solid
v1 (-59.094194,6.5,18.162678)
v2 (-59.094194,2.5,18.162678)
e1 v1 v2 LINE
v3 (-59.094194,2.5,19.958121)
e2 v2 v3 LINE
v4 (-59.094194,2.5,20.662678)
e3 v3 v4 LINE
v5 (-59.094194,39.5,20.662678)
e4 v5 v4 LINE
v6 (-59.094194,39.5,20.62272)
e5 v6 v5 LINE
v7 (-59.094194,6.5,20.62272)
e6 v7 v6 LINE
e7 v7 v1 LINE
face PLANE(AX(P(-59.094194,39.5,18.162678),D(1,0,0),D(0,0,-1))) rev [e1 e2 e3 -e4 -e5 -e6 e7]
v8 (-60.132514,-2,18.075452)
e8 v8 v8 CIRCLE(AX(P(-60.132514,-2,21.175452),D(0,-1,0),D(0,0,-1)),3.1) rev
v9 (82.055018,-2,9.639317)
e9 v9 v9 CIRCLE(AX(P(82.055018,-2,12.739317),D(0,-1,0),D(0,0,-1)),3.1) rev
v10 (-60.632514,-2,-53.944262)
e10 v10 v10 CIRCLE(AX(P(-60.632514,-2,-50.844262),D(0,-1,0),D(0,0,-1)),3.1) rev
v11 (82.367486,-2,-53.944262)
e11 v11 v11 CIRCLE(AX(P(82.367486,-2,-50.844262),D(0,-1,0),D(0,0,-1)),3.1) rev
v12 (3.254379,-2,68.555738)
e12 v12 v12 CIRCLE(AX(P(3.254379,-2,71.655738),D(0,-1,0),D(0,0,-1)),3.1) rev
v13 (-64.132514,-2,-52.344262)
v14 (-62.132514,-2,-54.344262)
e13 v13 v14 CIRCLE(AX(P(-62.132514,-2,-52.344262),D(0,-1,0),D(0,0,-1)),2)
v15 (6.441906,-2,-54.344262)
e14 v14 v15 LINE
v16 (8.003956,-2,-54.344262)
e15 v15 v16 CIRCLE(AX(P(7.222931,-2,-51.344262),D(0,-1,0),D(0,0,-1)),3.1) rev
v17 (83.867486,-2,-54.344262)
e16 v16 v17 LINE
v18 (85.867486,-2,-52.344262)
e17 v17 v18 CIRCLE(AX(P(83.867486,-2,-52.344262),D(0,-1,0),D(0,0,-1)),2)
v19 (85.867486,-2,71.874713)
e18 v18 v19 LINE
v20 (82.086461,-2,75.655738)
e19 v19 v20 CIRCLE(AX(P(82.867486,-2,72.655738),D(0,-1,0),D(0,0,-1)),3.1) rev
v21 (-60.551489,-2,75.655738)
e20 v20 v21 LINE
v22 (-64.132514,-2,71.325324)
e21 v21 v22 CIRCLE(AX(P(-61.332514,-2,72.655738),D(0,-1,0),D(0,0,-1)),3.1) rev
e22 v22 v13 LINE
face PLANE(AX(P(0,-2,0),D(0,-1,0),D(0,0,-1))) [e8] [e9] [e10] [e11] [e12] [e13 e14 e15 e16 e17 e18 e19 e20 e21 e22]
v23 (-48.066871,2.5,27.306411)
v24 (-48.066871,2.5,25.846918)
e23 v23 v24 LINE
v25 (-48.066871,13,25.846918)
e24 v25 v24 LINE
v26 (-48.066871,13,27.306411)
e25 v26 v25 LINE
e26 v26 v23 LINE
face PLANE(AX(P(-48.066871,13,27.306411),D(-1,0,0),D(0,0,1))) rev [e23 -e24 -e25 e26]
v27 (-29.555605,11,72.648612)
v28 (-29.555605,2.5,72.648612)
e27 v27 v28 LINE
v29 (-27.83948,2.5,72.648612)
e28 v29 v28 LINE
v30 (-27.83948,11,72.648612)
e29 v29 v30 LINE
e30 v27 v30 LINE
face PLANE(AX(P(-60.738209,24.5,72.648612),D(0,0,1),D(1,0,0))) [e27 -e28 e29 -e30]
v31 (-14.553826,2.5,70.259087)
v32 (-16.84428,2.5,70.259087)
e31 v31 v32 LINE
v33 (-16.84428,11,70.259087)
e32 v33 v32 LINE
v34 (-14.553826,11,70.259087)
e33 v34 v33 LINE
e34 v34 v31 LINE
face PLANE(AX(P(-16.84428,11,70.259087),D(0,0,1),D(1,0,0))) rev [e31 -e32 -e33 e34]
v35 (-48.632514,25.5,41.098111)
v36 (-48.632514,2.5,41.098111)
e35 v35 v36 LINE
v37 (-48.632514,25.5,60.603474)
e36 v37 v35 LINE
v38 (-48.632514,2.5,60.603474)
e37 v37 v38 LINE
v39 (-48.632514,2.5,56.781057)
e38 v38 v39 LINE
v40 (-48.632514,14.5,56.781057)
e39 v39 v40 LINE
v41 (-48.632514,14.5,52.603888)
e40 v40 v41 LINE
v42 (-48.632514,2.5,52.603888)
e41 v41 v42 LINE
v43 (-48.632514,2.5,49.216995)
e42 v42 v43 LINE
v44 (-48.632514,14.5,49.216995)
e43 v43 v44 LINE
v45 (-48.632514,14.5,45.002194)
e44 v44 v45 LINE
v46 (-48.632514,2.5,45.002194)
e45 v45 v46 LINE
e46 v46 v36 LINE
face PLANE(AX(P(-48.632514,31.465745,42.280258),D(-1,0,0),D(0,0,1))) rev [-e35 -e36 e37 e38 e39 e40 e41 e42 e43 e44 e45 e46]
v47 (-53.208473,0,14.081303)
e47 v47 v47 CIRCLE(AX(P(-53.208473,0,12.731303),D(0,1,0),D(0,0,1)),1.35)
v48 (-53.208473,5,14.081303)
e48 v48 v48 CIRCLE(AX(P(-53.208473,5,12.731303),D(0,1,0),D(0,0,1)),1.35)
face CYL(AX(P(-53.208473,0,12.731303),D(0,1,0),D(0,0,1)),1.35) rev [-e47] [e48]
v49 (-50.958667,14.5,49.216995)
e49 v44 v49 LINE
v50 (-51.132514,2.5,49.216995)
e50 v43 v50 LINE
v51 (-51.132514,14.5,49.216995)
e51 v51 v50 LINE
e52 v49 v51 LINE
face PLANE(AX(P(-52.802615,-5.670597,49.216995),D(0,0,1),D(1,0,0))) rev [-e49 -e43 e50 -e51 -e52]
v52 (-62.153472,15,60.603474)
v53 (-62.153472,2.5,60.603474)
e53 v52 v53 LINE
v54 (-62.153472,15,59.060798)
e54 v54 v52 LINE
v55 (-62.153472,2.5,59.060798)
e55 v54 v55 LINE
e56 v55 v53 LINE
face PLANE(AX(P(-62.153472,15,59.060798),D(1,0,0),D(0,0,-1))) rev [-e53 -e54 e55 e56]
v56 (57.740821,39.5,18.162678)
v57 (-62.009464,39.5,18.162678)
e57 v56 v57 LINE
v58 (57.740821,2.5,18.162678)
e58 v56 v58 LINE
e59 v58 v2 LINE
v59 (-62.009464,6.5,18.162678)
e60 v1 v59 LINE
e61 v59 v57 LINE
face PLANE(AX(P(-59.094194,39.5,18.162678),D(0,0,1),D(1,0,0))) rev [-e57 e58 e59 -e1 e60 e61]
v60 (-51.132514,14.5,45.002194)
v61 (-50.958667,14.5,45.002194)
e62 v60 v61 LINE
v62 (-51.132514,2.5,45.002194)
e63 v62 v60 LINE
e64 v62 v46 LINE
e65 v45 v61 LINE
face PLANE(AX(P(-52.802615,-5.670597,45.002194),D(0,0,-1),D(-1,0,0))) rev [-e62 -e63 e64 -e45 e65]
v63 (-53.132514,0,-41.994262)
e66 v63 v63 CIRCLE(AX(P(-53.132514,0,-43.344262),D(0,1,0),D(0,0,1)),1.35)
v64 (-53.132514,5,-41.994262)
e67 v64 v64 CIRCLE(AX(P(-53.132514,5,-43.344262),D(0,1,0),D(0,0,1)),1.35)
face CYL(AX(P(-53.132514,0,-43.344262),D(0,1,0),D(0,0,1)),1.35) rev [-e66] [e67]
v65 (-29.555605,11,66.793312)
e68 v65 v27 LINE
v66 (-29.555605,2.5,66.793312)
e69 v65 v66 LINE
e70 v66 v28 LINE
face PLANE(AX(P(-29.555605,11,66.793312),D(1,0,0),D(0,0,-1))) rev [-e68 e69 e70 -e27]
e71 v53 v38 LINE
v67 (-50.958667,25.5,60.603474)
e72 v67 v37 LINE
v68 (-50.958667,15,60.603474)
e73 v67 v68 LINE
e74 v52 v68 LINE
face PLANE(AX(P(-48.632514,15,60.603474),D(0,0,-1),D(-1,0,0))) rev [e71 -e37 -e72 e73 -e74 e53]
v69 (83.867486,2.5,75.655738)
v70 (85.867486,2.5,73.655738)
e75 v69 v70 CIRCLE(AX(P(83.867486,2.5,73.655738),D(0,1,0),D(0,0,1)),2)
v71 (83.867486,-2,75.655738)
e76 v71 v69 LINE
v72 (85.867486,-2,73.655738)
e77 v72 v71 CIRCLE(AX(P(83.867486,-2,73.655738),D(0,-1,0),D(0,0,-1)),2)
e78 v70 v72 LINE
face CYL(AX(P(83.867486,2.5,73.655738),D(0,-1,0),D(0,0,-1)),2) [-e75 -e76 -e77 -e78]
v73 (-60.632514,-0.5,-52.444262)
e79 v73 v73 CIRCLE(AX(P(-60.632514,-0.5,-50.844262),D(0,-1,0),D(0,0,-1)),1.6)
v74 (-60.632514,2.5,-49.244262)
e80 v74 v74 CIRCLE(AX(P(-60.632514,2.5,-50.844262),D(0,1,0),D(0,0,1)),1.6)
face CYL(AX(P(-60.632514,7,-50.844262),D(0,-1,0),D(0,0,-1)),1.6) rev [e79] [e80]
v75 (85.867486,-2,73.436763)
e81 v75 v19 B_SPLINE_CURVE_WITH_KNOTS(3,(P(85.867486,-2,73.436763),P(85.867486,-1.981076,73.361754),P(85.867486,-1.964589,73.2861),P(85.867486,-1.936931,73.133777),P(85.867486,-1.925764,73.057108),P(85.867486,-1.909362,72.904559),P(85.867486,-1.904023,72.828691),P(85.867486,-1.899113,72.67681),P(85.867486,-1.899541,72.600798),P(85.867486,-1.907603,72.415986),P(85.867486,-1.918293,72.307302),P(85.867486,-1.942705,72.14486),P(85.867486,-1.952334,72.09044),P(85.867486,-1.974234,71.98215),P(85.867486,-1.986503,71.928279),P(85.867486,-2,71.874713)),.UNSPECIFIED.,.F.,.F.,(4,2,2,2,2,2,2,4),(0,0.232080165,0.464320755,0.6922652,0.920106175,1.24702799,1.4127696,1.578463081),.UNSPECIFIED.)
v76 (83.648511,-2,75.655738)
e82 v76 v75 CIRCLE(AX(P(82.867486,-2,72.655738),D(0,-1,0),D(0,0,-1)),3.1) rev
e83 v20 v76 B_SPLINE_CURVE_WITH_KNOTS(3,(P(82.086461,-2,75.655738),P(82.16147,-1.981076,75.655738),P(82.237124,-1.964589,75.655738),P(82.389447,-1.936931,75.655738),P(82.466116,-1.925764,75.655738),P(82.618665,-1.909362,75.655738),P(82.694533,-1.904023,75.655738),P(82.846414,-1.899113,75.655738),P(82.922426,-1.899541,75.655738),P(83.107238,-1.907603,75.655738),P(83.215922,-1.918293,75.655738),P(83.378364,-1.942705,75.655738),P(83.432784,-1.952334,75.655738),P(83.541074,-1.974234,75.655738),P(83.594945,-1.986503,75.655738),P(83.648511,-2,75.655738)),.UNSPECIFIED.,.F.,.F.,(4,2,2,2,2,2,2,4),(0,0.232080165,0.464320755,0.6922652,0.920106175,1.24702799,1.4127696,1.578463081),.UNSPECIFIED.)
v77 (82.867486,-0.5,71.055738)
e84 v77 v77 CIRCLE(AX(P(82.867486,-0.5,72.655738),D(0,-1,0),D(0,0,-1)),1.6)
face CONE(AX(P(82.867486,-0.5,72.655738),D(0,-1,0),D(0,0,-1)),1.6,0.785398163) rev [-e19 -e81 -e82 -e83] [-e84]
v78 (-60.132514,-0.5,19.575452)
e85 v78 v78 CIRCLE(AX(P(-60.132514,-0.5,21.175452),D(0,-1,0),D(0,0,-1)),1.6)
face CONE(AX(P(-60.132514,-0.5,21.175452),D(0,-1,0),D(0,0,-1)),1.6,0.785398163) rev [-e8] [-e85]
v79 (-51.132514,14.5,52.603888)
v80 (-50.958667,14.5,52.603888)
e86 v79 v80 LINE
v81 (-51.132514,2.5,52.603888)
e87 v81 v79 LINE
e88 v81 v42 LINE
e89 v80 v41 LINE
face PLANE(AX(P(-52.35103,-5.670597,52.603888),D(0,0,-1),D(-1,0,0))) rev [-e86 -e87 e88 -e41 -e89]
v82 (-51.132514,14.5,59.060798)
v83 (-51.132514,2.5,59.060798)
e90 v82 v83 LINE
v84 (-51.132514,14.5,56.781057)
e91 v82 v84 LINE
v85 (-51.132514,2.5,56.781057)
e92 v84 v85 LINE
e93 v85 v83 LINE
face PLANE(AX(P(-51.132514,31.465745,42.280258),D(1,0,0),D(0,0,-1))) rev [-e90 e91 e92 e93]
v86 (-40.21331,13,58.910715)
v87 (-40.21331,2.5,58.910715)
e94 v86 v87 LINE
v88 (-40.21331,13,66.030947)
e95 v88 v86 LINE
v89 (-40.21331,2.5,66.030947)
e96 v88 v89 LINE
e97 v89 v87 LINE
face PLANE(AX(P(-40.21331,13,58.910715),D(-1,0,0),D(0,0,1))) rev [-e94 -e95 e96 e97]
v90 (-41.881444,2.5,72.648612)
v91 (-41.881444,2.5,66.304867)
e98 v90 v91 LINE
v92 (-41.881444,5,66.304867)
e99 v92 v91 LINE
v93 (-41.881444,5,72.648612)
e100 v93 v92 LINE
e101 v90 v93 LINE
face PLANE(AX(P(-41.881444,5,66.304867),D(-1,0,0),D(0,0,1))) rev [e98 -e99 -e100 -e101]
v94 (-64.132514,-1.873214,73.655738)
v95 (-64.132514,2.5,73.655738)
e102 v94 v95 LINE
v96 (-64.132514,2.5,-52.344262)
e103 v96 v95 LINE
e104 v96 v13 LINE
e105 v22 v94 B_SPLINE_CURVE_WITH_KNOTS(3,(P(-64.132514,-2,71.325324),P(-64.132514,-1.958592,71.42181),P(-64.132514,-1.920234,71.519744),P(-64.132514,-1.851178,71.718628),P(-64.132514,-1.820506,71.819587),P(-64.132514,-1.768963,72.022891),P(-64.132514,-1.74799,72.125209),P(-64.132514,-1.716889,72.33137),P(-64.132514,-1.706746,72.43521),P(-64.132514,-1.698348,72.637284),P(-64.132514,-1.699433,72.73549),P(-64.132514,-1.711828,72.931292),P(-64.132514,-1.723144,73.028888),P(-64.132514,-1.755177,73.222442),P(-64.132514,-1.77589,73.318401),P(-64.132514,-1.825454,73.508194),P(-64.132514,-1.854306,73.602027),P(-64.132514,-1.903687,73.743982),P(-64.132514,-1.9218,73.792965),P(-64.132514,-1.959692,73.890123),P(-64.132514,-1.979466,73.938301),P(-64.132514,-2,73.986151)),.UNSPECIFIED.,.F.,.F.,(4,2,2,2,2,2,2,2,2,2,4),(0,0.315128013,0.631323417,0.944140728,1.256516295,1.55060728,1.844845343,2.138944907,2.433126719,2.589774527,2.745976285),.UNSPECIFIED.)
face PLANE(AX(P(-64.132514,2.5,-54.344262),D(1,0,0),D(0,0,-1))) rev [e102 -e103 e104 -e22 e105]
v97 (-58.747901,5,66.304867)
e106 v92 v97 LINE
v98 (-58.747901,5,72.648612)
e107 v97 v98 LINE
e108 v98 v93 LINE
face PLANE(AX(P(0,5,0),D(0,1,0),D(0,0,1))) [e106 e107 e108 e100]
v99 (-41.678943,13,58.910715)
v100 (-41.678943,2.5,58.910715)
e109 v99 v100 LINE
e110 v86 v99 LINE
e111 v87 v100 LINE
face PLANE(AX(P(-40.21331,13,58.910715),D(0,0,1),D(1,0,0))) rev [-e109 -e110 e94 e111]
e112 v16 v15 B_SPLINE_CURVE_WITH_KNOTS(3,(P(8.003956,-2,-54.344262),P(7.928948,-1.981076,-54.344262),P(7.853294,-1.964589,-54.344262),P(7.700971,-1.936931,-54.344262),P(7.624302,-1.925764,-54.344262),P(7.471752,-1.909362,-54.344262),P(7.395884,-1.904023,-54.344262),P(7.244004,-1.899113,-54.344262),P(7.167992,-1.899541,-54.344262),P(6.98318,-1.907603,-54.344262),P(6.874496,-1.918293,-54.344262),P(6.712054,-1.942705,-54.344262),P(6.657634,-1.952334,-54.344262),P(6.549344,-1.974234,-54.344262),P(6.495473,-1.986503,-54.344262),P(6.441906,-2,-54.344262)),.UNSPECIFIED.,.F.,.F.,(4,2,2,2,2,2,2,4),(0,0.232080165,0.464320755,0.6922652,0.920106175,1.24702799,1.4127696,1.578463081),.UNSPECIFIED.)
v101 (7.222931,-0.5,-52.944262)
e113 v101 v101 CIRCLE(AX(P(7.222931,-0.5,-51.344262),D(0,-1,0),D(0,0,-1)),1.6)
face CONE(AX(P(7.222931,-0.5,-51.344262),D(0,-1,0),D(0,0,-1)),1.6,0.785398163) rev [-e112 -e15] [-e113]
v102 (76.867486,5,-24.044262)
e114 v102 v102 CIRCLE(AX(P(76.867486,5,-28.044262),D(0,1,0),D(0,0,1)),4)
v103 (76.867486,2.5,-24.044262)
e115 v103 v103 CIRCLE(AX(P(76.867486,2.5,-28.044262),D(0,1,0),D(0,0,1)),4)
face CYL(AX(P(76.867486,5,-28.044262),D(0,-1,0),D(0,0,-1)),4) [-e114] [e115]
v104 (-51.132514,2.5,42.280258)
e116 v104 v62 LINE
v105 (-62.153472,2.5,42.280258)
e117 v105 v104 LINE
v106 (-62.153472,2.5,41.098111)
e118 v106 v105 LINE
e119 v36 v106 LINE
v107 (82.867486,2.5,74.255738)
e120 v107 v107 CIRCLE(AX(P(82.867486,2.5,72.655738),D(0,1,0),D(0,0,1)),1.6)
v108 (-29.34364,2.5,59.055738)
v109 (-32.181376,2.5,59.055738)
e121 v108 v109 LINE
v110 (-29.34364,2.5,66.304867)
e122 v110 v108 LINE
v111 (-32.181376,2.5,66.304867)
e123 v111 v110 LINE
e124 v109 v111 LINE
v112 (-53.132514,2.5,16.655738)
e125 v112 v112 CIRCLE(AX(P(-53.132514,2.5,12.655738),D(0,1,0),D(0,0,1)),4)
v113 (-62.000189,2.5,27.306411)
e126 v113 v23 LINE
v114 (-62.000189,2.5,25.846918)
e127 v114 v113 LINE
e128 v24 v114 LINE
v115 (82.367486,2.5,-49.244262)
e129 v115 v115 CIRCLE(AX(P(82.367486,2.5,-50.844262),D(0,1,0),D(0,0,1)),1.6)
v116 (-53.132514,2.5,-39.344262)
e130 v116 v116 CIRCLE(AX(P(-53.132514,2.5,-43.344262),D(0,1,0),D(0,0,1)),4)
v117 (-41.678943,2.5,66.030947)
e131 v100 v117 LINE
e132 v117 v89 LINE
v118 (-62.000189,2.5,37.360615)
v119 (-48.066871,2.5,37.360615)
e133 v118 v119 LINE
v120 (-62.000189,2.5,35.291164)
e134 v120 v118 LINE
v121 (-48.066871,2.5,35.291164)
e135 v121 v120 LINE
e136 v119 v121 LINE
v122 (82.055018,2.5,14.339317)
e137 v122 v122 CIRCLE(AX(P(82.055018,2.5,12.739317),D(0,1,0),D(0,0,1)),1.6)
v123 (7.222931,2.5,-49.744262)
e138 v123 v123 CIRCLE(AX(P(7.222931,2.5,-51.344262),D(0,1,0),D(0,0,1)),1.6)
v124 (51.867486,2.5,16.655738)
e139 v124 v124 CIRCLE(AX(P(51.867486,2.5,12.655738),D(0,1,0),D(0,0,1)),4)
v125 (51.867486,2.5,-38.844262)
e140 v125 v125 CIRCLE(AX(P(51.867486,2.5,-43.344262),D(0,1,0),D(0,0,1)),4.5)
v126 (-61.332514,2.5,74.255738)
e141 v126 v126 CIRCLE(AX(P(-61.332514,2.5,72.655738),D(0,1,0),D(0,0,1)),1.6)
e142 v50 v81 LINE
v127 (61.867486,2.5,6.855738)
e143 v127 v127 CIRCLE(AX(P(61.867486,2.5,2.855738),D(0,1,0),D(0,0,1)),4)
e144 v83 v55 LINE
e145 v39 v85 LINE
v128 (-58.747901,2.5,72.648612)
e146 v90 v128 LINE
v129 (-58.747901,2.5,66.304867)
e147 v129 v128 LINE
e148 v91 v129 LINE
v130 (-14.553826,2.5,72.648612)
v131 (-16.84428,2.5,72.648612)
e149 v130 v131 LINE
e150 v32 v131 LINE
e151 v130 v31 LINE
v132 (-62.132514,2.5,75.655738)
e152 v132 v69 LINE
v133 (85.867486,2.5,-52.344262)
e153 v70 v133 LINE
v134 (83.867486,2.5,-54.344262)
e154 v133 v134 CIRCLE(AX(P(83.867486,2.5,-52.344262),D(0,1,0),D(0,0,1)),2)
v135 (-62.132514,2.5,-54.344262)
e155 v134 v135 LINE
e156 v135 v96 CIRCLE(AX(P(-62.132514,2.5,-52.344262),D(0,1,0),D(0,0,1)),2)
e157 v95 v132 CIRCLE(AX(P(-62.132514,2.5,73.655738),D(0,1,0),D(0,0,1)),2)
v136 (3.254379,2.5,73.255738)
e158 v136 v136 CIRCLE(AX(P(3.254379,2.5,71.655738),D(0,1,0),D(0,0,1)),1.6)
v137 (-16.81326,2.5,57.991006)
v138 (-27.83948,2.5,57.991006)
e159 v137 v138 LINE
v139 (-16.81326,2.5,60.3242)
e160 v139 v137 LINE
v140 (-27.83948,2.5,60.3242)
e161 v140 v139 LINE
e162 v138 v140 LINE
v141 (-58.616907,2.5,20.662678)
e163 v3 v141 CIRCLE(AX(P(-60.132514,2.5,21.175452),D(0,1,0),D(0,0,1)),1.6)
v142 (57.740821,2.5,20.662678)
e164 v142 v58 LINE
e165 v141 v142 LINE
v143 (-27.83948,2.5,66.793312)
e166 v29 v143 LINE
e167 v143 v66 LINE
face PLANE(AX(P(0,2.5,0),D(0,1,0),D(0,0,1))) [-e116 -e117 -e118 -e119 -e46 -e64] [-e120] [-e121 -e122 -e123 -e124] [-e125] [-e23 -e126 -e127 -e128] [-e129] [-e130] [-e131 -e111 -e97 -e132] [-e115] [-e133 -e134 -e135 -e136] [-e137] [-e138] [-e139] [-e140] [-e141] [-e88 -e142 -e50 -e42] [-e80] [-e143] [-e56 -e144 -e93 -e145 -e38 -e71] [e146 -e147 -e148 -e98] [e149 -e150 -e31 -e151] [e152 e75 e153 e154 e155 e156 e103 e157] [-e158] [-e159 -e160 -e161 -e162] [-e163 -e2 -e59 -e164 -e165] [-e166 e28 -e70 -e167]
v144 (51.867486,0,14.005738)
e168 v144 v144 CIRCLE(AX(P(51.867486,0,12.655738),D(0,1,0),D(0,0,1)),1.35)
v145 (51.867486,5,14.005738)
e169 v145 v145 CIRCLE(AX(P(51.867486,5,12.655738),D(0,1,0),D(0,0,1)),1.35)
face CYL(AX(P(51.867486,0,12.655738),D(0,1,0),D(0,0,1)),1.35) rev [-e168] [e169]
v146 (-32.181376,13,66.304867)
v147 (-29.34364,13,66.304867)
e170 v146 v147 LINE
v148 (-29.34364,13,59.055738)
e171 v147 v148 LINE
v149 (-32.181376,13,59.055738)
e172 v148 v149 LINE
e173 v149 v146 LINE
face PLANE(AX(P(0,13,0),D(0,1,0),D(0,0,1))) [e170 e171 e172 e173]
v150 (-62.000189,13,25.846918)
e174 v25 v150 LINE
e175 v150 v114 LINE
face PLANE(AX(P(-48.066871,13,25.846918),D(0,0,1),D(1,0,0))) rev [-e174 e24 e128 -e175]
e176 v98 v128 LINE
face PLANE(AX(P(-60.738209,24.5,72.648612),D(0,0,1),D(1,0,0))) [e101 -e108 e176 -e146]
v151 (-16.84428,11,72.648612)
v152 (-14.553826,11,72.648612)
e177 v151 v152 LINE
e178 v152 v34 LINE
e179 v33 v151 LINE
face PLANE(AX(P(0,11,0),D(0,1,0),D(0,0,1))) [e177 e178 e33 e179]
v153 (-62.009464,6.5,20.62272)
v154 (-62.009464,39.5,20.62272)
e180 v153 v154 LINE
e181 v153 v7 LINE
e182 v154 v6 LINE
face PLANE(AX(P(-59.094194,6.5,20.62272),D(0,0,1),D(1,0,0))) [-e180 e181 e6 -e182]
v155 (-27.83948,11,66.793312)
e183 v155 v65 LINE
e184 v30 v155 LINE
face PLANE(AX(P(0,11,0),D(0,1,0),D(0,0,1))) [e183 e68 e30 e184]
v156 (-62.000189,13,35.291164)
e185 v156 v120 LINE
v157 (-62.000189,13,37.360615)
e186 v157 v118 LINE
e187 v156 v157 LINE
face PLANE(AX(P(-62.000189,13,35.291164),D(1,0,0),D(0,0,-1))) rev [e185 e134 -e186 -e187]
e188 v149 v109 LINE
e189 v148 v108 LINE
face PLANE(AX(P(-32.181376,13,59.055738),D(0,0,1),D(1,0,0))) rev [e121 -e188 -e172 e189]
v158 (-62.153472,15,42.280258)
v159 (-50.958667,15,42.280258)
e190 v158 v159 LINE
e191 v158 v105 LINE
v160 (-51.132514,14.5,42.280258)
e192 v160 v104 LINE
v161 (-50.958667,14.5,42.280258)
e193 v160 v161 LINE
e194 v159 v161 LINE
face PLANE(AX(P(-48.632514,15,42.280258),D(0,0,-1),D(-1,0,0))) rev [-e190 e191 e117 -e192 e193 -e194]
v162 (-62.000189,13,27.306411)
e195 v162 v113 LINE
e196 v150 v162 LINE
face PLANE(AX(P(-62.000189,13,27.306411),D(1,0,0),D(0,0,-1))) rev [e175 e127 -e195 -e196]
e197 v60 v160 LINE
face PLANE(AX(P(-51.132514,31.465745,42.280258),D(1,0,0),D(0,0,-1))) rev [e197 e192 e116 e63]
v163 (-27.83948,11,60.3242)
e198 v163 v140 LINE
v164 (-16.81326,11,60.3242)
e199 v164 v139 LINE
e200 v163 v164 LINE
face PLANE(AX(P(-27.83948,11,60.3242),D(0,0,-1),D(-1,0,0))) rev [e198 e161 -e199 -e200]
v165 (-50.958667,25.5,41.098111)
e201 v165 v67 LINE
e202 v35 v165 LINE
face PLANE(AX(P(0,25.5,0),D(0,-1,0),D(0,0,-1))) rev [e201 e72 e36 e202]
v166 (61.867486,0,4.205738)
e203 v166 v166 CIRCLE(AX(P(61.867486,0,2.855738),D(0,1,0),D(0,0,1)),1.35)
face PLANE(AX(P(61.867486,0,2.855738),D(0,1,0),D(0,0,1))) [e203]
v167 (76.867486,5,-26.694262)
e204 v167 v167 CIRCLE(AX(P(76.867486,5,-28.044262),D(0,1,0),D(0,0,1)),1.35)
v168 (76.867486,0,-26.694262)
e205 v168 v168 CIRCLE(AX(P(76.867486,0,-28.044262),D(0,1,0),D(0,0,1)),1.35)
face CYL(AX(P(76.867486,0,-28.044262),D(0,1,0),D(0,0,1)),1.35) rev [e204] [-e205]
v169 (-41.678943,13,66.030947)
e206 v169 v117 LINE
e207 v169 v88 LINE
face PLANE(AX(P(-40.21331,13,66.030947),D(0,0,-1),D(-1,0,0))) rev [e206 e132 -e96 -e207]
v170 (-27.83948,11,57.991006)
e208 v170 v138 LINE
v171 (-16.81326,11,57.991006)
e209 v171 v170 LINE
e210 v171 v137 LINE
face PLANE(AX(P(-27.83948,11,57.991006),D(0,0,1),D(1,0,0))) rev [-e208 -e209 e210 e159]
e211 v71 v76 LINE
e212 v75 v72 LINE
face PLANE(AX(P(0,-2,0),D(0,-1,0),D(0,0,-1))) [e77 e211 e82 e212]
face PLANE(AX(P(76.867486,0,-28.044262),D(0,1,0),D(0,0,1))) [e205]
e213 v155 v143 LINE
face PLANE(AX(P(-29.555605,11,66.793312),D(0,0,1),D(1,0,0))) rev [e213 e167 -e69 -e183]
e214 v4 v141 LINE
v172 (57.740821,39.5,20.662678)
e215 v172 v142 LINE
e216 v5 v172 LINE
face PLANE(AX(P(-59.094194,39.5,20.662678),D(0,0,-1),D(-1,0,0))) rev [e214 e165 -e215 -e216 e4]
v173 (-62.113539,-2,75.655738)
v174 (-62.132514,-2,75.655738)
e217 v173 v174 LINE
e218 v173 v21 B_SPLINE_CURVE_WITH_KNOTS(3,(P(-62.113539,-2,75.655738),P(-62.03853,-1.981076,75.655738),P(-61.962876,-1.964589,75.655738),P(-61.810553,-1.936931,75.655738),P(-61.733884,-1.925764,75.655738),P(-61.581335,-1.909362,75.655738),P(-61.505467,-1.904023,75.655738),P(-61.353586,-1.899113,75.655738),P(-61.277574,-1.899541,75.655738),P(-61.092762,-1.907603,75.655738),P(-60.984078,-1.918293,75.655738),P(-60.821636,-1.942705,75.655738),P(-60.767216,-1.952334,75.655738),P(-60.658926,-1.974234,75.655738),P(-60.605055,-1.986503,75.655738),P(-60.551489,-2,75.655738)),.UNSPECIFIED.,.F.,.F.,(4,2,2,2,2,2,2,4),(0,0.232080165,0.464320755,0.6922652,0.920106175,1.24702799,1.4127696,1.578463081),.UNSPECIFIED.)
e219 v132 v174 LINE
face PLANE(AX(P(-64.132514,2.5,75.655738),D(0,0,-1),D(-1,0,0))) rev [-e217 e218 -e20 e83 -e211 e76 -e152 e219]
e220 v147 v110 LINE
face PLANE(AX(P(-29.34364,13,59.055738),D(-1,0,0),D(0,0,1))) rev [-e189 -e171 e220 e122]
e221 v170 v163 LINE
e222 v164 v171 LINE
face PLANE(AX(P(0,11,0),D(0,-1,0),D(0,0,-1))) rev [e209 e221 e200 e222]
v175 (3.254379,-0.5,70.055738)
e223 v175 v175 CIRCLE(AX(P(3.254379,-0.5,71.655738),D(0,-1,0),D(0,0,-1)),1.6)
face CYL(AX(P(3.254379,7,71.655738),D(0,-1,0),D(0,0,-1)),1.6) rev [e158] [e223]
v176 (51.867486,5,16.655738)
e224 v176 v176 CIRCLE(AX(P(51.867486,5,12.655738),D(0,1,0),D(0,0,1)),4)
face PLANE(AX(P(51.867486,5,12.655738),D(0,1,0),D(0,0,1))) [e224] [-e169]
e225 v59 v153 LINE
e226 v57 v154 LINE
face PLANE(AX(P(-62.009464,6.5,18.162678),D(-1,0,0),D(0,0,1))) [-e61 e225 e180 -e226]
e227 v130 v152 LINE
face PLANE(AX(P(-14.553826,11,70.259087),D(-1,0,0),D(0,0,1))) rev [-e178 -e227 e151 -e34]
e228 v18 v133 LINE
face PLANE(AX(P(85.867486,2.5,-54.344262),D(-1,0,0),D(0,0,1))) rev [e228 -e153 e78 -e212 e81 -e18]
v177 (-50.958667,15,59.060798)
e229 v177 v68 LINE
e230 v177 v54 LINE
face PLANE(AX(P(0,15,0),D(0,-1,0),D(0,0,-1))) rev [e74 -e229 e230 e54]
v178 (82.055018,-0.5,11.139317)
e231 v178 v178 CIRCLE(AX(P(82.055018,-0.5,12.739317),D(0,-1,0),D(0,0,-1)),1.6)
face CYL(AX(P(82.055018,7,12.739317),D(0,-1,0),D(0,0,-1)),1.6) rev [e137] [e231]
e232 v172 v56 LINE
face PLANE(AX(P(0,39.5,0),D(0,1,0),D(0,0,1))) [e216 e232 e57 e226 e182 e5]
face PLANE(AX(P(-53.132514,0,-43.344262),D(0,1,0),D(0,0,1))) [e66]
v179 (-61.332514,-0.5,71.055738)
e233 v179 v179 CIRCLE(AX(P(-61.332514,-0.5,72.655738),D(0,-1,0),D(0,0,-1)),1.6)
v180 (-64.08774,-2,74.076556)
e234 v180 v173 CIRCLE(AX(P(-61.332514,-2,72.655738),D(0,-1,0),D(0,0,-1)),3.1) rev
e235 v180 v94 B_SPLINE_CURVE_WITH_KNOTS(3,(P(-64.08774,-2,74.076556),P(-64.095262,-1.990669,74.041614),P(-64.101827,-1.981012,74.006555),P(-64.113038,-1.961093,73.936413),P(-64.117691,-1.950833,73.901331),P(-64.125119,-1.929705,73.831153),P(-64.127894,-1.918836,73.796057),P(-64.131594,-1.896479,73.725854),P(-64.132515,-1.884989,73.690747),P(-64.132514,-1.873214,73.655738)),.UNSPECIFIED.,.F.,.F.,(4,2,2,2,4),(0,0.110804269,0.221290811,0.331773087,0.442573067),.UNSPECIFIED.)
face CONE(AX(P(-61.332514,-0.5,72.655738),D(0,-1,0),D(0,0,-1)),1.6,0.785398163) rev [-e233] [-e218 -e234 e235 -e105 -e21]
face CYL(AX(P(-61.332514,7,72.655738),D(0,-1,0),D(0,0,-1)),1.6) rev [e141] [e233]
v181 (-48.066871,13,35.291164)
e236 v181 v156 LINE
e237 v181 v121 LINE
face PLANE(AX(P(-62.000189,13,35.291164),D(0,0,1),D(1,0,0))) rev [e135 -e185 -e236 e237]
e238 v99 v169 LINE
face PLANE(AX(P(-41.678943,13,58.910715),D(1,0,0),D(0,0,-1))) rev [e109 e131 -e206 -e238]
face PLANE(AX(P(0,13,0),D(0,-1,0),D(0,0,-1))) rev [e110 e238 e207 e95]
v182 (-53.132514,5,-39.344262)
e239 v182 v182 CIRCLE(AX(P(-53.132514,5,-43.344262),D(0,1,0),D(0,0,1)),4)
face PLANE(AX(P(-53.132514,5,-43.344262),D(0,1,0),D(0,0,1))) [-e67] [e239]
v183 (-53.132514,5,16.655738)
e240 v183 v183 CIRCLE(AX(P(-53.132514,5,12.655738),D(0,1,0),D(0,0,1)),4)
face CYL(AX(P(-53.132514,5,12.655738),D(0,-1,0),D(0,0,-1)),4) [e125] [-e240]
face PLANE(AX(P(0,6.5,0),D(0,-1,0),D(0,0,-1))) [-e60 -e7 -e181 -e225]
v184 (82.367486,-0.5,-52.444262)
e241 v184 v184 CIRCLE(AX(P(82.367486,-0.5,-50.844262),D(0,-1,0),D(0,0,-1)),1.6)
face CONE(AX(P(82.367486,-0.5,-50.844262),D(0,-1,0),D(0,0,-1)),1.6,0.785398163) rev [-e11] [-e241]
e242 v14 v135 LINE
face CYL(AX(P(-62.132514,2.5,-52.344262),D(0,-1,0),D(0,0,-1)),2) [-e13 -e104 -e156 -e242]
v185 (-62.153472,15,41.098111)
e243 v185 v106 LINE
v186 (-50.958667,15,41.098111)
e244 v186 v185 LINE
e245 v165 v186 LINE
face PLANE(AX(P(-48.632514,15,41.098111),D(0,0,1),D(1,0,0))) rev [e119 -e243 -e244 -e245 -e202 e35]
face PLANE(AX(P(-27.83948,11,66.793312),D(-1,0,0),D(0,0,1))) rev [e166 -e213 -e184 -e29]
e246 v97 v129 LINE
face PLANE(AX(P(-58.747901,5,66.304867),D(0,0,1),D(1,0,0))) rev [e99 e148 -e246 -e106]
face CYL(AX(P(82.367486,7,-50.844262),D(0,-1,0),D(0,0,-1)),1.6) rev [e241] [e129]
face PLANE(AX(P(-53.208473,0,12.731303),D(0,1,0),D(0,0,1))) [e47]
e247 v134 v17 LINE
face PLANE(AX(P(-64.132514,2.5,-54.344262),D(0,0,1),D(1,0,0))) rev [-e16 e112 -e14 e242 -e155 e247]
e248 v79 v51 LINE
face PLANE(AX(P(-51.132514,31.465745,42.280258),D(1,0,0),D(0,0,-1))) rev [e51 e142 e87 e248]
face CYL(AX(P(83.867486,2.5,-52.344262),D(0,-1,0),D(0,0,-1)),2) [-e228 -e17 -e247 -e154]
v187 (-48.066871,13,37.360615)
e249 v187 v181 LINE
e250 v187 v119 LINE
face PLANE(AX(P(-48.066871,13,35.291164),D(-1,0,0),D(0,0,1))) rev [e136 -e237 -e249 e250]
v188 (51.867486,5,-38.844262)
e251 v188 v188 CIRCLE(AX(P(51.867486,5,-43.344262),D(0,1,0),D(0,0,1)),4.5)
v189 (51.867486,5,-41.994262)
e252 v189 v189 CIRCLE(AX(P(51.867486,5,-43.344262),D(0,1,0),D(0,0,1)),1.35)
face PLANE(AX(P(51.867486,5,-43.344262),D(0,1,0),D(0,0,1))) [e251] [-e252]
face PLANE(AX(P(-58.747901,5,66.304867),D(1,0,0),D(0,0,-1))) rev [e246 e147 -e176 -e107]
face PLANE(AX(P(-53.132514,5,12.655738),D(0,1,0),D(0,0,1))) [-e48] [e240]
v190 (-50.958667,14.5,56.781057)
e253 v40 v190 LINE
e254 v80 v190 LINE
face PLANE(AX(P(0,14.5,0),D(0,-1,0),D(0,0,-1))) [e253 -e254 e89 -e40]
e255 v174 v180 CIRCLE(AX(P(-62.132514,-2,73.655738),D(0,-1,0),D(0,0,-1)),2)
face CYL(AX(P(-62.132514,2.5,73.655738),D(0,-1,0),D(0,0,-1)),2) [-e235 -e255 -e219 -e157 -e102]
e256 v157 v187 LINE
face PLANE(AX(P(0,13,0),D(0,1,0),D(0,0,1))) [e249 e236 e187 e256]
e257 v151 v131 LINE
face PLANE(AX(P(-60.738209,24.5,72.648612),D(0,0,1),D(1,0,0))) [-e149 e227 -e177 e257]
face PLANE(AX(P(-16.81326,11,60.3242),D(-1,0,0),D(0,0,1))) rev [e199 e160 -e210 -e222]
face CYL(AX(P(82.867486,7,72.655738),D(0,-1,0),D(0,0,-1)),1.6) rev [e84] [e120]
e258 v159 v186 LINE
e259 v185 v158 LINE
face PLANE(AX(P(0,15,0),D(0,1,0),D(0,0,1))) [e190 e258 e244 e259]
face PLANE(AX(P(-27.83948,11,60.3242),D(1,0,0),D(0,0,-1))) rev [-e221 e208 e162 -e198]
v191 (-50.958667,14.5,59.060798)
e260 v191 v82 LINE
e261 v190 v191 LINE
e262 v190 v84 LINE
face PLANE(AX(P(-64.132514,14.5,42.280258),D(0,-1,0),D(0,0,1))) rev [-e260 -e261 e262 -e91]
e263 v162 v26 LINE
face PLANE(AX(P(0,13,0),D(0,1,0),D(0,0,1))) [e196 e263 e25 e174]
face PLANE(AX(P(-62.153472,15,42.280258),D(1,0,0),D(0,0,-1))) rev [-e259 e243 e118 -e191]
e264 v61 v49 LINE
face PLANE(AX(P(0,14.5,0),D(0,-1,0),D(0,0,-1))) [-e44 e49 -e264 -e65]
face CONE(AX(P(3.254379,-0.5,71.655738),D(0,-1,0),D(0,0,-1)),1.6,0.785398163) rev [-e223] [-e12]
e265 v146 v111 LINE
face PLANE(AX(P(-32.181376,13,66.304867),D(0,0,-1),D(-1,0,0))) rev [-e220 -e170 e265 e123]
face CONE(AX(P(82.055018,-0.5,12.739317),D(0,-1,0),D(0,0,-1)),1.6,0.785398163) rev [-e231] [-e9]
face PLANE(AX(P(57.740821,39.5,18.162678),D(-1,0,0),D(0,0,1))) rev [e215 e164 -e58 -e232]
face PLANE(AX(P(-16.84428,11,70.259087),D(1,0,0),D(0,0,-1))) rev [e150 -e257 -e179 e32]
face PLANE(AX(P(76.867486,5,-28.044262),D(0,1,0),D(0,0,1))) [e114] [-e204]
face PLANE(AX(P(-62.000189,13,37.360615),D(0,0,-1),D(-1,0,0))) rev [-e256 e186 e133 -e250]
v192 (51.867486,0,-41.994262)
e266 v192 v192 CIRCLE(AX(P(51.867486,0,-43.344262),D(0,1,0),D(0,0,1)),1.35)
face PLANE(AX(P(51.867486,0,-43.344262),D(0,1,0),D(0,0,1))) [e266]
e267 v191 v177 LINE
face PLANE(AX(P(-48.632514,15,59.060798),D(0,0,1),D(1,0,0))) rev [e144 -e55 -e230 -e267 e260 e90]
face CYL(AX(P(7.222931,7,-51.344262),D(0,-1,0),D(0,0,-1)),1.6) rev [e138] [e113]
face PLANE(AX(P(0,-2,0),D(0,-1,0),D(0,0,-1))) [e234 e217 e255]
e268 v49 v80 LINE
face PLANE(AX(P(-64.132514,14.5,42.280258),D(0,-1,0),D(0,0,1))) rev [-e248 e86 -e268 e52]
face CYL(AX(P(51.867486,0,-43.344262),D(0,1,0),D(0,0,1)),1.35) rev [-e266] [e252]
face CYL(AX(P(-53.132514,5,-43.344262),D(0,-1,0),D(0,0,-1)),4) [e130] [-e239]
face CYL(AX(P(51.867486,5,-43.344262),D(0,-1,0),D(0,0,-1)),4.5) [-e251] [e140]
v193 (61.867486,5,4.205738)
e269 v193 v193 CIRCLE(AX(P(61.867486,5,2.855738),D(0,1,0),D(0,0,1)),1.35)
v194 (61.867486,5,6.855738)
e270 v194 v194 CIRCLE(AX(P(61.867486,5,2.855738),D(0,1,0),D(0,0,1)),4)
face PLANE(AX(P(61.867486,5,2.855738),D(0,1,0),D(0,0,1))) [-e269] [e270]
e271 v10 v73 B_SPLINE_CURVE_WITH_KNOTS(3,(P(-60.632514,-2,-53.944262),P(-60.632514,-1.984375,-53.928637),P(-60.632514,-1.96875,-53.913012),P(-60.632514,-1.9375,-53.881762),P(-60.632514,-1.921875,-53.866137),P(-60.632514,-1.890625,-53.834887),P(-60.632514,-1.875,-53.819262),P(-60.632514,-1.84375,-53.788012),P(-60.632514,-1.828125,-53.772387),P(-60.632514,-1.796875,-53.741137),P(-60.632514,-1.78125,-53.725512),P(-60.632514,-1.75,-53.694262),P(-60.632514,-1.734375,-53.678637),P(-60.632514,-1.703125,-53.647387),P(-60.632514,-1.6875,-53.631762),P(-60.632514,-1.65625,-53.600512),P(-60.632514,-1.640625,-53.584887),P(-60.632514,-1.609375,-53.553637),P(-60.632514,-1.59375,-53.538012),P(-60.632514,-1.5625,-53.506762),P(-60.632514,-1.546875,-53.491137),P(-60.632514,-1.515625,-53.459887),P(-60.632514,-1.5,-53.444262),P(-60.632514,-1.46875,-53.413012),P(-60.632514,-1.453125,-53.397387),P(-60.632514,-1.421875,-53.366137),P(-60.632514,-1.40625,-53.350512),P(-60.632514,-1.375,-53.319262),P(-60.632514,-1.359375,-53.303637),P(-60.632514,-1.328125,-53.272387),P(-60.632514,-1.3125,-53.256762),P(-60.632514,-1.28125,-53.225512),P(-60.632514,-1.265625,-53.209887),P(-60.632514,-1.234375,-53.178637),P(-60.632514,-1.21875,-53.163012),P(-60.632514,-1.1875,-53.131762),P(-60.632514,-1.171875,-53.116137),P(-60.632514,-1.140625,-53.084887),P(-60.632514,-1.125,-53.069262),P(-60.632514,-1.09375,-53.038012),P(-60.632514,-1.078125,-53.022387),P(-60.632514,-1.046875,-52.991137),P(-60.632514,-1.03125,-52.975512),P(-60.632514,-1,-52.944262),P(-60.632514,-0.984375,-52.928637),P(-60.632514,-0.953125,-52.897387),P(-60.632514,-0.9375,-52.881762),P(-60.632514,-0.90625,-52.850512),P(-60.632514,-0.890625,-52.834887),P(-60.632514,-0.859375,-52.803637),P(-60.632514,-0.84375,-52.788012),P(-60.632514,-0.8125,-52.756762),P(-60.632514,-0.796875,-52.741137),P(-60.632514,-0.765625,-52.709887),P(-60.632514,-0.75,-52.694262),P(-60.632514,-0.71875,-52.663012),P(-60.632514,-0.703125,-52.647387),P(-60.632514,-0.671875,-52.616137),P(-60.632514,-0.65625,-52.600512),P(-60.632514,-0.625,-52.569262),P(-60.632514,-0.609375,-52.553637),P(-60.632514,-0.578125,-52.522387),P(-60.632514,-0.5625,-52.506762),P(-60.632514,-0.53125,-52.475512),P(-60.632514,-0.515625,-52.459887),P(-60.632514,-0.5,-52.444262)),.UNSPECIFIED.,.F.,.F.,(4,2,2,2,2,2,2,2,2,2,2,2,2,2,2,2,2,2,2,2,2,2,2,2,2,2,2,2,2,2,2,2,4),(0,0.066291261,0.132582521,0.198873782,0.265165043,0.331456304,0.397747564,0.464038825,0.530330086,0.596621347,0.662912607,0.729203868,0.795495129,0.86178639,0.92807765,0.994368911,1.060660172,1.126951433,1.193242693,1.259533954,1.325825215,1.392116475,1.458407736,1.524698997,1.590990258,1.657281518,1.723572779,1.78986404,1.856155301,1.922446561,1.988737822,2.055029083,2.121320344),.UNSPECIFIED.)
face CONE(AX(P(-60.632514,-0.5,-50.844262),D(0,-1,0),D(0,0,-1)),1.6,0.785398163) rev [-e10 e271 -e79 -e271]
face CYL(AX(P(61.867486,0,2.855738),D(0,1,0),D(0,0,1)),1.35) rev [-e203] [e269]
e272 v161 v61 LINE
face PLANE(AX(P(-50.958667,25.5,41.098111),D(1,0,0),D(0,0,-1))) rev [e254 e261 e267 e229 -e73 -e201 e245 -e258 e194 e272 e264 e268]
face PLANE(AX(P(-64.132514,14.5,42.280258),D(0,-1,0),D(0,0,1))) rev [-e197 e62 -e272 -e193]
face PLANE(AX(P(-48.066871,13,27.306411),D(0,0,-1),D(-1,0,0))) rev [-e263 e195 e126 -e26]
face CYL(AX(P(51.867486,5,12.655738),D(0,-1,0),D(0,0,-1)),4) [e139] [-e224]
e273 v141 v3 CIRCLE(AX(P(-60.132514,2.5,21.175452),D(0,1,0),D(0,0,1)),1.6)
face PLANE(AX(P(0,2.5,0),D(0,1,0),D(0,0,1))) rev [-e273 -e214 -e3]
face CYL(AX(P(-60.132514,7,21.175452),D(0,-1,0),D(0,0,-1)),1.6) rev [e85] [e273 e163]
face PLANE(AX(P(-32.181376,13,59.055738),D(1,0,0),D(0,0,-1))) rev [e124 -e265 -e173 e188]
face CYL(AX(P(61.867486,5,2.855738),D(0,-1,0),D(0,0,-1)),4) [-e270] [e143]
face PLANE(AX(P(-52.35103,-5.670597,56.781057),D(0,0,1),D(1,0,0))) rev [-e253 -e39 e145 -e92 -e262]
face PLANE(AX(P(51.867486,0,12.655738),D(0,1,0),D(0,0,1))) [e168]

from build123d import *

# Parameters (mm, degrees)
SKETCH1_W            = 150
SKETCH1_H            = 130
BOSS_EXTRUDE1_DEPTH  = 2.5
SKETCH2_W            = 150
SKETCH2_H            = 130
BOSS_EXTRUDE2_DEPTH  = 2
SKETCH3_W            = 2.5
SKETCH3_H            = 16.780539685
BOSS_EXTRUDE3_DEPTH  = 12
SKETCH4_W            = 6.999579775
SKETCH4_H            = 4.214800725
SKETCH4_W_2          = 6.547993983
SKETCH4_H_2          = 4.177168575
CUT_EXTRUDE1_DEPTH   = 12
SKETCH5_W            = 13.520958653
SKETCH5_H            = 1.542676049
SKETCH5_H_2          = 1.182146985
BOSS_EXTRUDE4_DEPTH  = 12.5
SKETCH6_W            = 16.86645729
SKETCH6_H            = 7.123900825
BOSS_EXTRUDE5_DEPTH  = 2.5
SKETCH7_W            = 13.933318375
SKETCH7_H            = 1.459493224
SKETCH7_H_2          = 2.069451468
BOSS_EXTRUDE6_DEPTH  = 10.5
SKETCH8_W            = 1.465633043
SKETCH8_H            = 7.120231944
SKETCH8_W_2          = 2.837736244
SKETCH8_H_2          = 7.249129709
BOSS_EXTRUDE8_DEPTH  = 10.5
SKETCH9_W            = 11.026219754
SKETCH9_H            = 2.333193258
SKETCH9_W_2          = 2.290453933
SKETCH9_H_2          = 3.041515947
SKETCH9_W_3          = 1.716125118
SKETCH9_H_3          = 6.956645693
BOSS_EXTRUDE9_DEPTH  = 8.5
SKETCH10_W           = 64.150572822
SKETCH10_H           = 1.749214845
CUT_EXTRUDE2_DEPTH   = 22
SKETCH11_R           = 4
SKETCH11_R_2         = 4.5
BOSS_EXTRUDE10_DEPTH = 2.5
SKETCH12_R           = 1.35
CUT_EXTRUDE3_DEPTH   = 5
SKETCH13_R           = 1.6
CUT_EXTRUDE4_DEPTH   = 9
CHAMFER1_SIZE        = 1.5
FILLET1_R            = 2
SKETCH14_W           = 2.326153497
SKETCH14_H           = 19.505362719
BOSS_EXTRUDE11_DEPTH = 11
SKETCH15_W           = 116.835015105
SKETCH15_H           = 2.5
BOSS_EXTRUDE12_DEPTH = 37
SKETCH16_W           = 2.915269742
SKETCH16_H           = 2.460041161
BOSS_EXTRUDE13_DEPTH = 33


with BuildPart() as part:
    # Sketch1 → Boss-Extrude1 (new body)
    with BuildSketch(Plane(origin=(0, 0, 0), x_dir=(1, 0, 0), z_dir=(0, 1, 0))):
        with Locations((10.867486339, -10.655737705)):
            Rectangle(SKETCH1_W, SKETCH1_H)
    extrude(amount=BOSS_EXTRUDE1_DEPTH)

    # Sketch2 → Boss-Extrude2 (add)
    with BuildSketch(Plane.XZ):
        with Locations((10.867486339, 10.655737705)):
            Rectangle(SKETCH2_W, SKETCH2_H)
    extrude(amount=BOSS_EXTRUDE2_DEPTH)

    # Sketch3 → Boss-Extrude3 (add)
    with BuildSketch(Plane(origin=(0, 2.5, 0), x_dir=(1, 0, 0), z_dir=(0, 1, 0))):
        with Locations((-49.882513661, -50.670528215)):
            Rectangle(SKETCH3_W, SKETCH3_H)
    extrude(amount=BOSS_EXTRUDE3_DEPTH)

    # Sketch4 → Cut-Extrude1 (cut)
    with BuildSketch(Plane(origin=(0, 14.5, 0), x_dir=(1, 0, 0), z_dir=(0, 1, 0))):
        with Locations((-49.30282547, -47.109594286)):
            Rectangle(SKETCH4_W, SKETCH4_H)
        with Locations((-49.077032574, -54.692472376)):
            Rectangle(SKETCH4_W_2, SKETCH4_H_2)
    extrude(amount=-CUT_EXTRUDE1_DEPTH, mode=Mode.SUBTRACT)

    # Sketch5 → Boss-Extrude4 (add)
    with BuildSketch(Plane(origin=(0, 2.5, 0), x_dir=(1, 0, 0), z_dir=(0, 1, 0))):
        with Locations((-55.392992988, -59.832136082)):
            Rectangle(SKETCH5_W, SKETCH5_H)
        with Locations((-55.392992988, -41.68918488)):
            Rectangle(SKETCH5_W, SKETCH5_H_2)
    extrude(amount=BOSS_EXTRUDE4_DEPTH)

    # Sketch6 → Boss-Extrude5 (add)
    with BuildSketch(Plane(origin=(0, 2.5, 0), x_dir=(1, 0, 0), z_dir=(0, 1, 0))):
        with Locations((-50.314672673, -69.866817827)):
            Rectangle(SKETCH6_W, SKETCH6_H)
    extrude(amount=BOSS_EXTRUDE5_DEPTH)

    # Sketch7 → Boss-Extrude6 (add)
    with BuildSketch(Plane(origin=(0, 2.5, 0), x_dir=(1, 0, 0), z_dir=(0, 1, 0))):
        with Locations((-55.033530113, -26.576664837)):
            Rectangle(SKETCH7_W, SKETCH7_H)
        with Locations((-55.033530113, -36.325889274)):
            Rectangle(SKETCH7_W, SKETCH7_H_2)
    extrude(amount=BOSS_EXTRUDE6_DEPTH)

    # Sketch8 → Boss-Extrude8 (add)
    with BuildSketch(Plane(origin=(0, 2.5, 0), x_dir=(1, 0, 0), z_dir=(0, 1, 0))):
        with Locations((-40.946126135, -62.470830958)):
            Rectangle(SKETCH8_W, SKETCH8_H)
        with Locations((-30.762507723, -62.68030256)):
            Rectangle(SKETCH8_W_2, SKETCH8_H_2)
    extrude(amount=BOSS_EXTRUDE8_DEPTH)

    # Sketch9 → Boss-Extrude9 (add)
    with BuildSketch(Plane(origin=(0, 2.5, 0), x_dir=(1, 0, 0), z_dir=(0, 1, 0))):
        with Locations((-22.326370107, -59.157602986)):
            Rectangle(SKETCH9_W, SKETCH9_H)
        with Locations((-15.699052952, -71.779845012)):
            Rectangle(SKETCH9_W_2, SKETCH9_H_2)
        with Locations((-28.697542543, -70.271634632)):
            Rectangle(SKETCH9_W_3, SKETCH9_H_3)
    extrude(amount=BOSS_EXTRUDE9_DEPTH)

    # Sketch10 → Cut-Extrude2 (cut)
    with BuildSketch(Plane(origin=(0, 2.5, 0), x_dir=(1, 0, 0), z_dir=(0, 1, 0))):
        with Locations((-28.662922823, -73.523219452)):
            Rectangle(SKETCH10_W, SKETCH10_H)
    extrude(amount=CUT_EXTRUDE2_DEPTH, mode=Mode.SUBTRACT)

    # Sketch11 → Boss-Extrude10 (add)
    with BuildSketch(Plane(origin=(0, 2.5, 0), x_dir=(1, 0, 0), z_dir=(0, 1, 0))):
        with Locations(Location((61.867486339, -2.855737705, 0), (0, 0, 270))):
            Circle(SKETCH11_R)
        with Locations(Location((76.867486339, 28.044262295, 0), (0, 0, 270))):
            Circle(SKETCH11_R)
        with Locations(Location((51.867486339, 43.344262295, 0), (0, 0, 270))):
            Circle(SKETCH11_R_2)
        with Locations(Location((51.867486339, -12.655737705, 0), (0, 0, 270))):
            Circle(SKETCH11_R)
        with Locations(Location((-53.132513661, -12.655737705, 0), (0, 0, 270))):
            Circle(SKETCH11_R)
        with Locations(Location((-53.132513661, 43.344262295, 0), (0, 0, 270))):
            Circle(SKETCH11_R)
    extrude(amount=BOSS_EXTRUDE10_DEPTH)

    # Sketch12 → Cut-Extrude3 (cut)
    with BuildSketch(Plane(origin=(0, 5, 0), x_dir=(1, 0, 0), z_dir=(0, 1, 0))):
        with Locations(Location((-53.208473164, -12.731303325, 0), (0, 0, 270))):
            Circle(SKETCH12_R)
        with Locations(Location((-53.132513661, 43.344262295, 0), (0, 0, 270))):
            Circle(SKETCH12_R)
        with Locations(Location((51.867486339, 43.344262295, 0), (0, 0, 270))):
            Circle(SKETCH12_R)
        with Locations(Location((51.867486339, -12.655737705, 0), (0, 0, 270))):
            Circle(SKETCH12_R)
        with Locations(Location((61.867486339, -2.855737705, 0), (0, 0, 270))):
            Circle(SKETCH12_R)
        with Locations(Location((76.867486339, 28.044262295, 0), (0, 0, 270))):
            Circle(SKETCH12_R)
    extrude(amount=-CUT_EXTRUDE3_DEPTH, mode=Mode.SUBTRACT)

    # Sketch13 → Cut-Extrude4 (cut)
    with BuildSketch(Plane.XZ.offset(2)):
        with Locations(Location((-61.332513661, 72.655737705, 0), (0, 0, 270))):
            Circle(SKETCH13_R)
        with Locations(Location((3.254378963, 71.655737705, 0), (0, 0, 270))):
            Circle(SKETCH13_R)
        with Locations(Location((82.867486339, 72.655737705, 0), (0, 0, 270))):
            Circle(SKETCH13_R)
        with Locations(Location((82.367486339, -50.844262295, 0), (0, 0, 270))):
            Circle(SKETCH13_R)
        with Locations(Location((-60.632513661, -50.844262295, 0), (0, 0, 270))):
            Circle(SKETCH13_R)
        with Locations(Location((7.222931356, -51.344262295, 0), (0, 0, 270))):
            Circle(SKETCH13_R)
        with Locations(Location((-60.132513661, 21.175451705, 0), (0, 0, 270))):
            Circle(SKETCH13_R)
        with Locations(Location((82.055017687, 12.739317464, 0), (0, 0, 270))):
            Circle(SKETCH13_R)
    extrude(amount=-CUT_EXTRUDE4_DEPTH, mode=Mode.SUBTRACT)

    # Chamfer1
    # the kernel refuses this chamfer: 1.5 mm, written as the material it takes off along each edge
    with BuildSketch(Plane(origin=(3.254378963, -2, 71.655737705), x_dir=(0, 0, -1), z_dir=(-1, 0, 0))) as chamfer1_piece_1:
        Polygon((1.6 + CHAMFER1_SIZE, 0), (1.6, -CHAMFER1_SIZE), (1.6, 0), align=None)
    revolve(axis=Axis((3.254378963, -2, 71.655737705), (0, -1, 0)), mode=Mode.SUBTRACT)
    with BuildSketch(Plane(origin=(82.867486339, -2, 72.655737705), x_dir=(0, 0, -1), z_dir=(-1, 0, 0))) as chamfer1_piece_2:
        Polygon((1.6 + CHAMFER1_SIZE, 0), (1.6, -CHAMFER1_SIZE), (1.6, 0), align=None)
    revolve(axis=Axis((82.867486339, -2, 72.655737705), (0, -1, 0)), mode=Mode.SUBTRACT)
    with BuildSketch(Plane(origin=(82.367486339, -2, -50.844262295), x_dir=(0, 0, -1), z_dir=(-1, 0, 0))) as chamfer1_piece_3:
        Polygon((1.6 + CHAMFER1_SIZE, 0), (1.6, -CHAMFER1_SIZE), (1.6, 0), align=None)
    revolve(axis=Axis((82.367486339, -2, -50.844262295), (0, -1, 0)), mode=Mode.SUBTRACT)
    with BuildSketch(Plane(origin=(-60.632513661, -2, -50.844262295), x_dir=(0, 0, -1), z_dir=(-1, 0, 0))) as chamfer1_piece_4:
        Polygon((1.6 + CHAMFER1_SIZE, 0), (1.6, -CHAMFER1_SIZE), (1.6, 0), align=None)
    revolve(axis=Axis((-60.632513661, -2, -50.844262295), (0, -1, 0)), mode=Mode.SUBTRACT)
    with BuildSketch(Plane(origin=(7.222931356, -2, -51.344262295), x_dir=(0, 0, -1), z_dir=(-1, 0, 0))) as chamfer1_piece_5:
        Polygon((1.6 + CHAMFER1_SIZE, 0), (1.6, -CHAMFER1_SIZE), (1.6, 0), align=None)
    revolve(axis=Axis((7.222931356, -2, -51.344262295), (0, -1, 0)), mode=Mode.SUBTRACT)
    with BuildSketch(Plane(origin=(-60.132513661, -2, 21.175451705), x_dir=(0, 0, -1), z_dir=(-1, 0, 0))) as chamfer1_piece_6:
        Polygon((1.6 + CHAMFER1_SIZE, 0), (1.6, -CHAMFER1_SIZE), (1.6, 0), align=None)
    revolve(axis=Axis((-60.132513661, -2, 21.175451705), (0, -1, 0)), mode=Mode.SUBTRACT)
    with BuildSketch(Plane(origin=(82.055017687, -2, 12.739317464), x_dir=(0, 0, -1), z_dir=(-1, 0, 0))) as chamfer1_piece_7:
        Polygon((1.6 + CHAMFER1_SIZE, 0), (1.6, -CHAMFER1_SIZE), (1.6, 0), align=None)
    revolve(axis=Axis((82.055017687, -2, 12.739317464), (0, -1, 0)), mode=Mode.SUBTRACT)
    with BuildSketch(Plane(origin=(-61.332513661, -2, 72.655737705), x_dir=(0, 0, -1), z_dir=(-1, 0, 0))) as chamfer1_piece_8:
        Polygon((1.6 + CHAMFER1_SIZE, 0), (1.6, -CHAMFER1_SIZE), (1.6, 0), align=None)
    revolve(axis=Axis((-61.332513661, -2, 72.655737705), (0, -1, 0)), mode=Mode.SUBTRACT)

    # Fillet1
    # the kernel refuses this fillet: 2 mm, written as the material it takes off along each edge
    with BuildSketch(Plane(origin=(-64.132513661, -7, -54.344262295), x_dir=(1, 0, 0), z_dir=(0, 1, 0)), Plane(origin=(85.867486339, 7.5, -54.344262295), x_dir=(-1, 0, 0), z_dir=(0, -1, 0)), Plane(origin=(85.867486339, 7.5, 75.655737705), x_dir=(0, 0, -1), z_dir=(0, -1, 0)), Plane(origin=(-64.132513661, -7, 75.655737705), x_dir=(0, 0, -1), z_dir=(0, 1, 0))) as fillet1_piece_1:
        with BuildLine():
            CenterArc((FILLET1_R, -FILLET1_R), FILLET1_R, 90, 90)
            Line((0, -FILLET1_R), (0, 0))
            Line((0, 0), (FILLET1_R, 0))
        make_face()
    extrude(amount=14.5, mode=Mode.SUBTRACT)

    # Sketch14 → Boss-Extrude11 (add)
    with BuildSketch(Plane(origin=(0, 14.5, 0), x_dir=(1, 0, 0), z_dir=(0, 1, 0))):
        with Locations((-49.79559041, -50.850792747)):
            Rectangle(SKETCH14_W, SKETCH14_H)
    extrude(amount=BOSS_EXTRUDE11_DEPTH)

    # Sketch15 → Boss-Extrude12 (add)
    with BuildSketch(Plane(origin=(0, 2.5, 0), x_dir=(1, 0, 0), z_dir=(0, 1, 0))):
        with Locations((-0.676686853, -19.412678434)):
            Rectangle(SKETCH15_W, SKETCH15_H)
    extrude(amount=BOSS_EXTRUDE12_DEPTH)

    # Sketch16 → Boss-Extrude13 (add)
    with BuildSketch(Plane(origin=(0, 39.5, 0), x_dir=(1, 0, 0), z_dir=(0, 1, 0))):
        with Locations((-60.551829276, -19.392699014)):
            Rectangle(SKETCH16_W, SKETCH16_H)
    extrude(amount=-BOSS_EXTRUDE13_DEPTH)


solid = part.part
